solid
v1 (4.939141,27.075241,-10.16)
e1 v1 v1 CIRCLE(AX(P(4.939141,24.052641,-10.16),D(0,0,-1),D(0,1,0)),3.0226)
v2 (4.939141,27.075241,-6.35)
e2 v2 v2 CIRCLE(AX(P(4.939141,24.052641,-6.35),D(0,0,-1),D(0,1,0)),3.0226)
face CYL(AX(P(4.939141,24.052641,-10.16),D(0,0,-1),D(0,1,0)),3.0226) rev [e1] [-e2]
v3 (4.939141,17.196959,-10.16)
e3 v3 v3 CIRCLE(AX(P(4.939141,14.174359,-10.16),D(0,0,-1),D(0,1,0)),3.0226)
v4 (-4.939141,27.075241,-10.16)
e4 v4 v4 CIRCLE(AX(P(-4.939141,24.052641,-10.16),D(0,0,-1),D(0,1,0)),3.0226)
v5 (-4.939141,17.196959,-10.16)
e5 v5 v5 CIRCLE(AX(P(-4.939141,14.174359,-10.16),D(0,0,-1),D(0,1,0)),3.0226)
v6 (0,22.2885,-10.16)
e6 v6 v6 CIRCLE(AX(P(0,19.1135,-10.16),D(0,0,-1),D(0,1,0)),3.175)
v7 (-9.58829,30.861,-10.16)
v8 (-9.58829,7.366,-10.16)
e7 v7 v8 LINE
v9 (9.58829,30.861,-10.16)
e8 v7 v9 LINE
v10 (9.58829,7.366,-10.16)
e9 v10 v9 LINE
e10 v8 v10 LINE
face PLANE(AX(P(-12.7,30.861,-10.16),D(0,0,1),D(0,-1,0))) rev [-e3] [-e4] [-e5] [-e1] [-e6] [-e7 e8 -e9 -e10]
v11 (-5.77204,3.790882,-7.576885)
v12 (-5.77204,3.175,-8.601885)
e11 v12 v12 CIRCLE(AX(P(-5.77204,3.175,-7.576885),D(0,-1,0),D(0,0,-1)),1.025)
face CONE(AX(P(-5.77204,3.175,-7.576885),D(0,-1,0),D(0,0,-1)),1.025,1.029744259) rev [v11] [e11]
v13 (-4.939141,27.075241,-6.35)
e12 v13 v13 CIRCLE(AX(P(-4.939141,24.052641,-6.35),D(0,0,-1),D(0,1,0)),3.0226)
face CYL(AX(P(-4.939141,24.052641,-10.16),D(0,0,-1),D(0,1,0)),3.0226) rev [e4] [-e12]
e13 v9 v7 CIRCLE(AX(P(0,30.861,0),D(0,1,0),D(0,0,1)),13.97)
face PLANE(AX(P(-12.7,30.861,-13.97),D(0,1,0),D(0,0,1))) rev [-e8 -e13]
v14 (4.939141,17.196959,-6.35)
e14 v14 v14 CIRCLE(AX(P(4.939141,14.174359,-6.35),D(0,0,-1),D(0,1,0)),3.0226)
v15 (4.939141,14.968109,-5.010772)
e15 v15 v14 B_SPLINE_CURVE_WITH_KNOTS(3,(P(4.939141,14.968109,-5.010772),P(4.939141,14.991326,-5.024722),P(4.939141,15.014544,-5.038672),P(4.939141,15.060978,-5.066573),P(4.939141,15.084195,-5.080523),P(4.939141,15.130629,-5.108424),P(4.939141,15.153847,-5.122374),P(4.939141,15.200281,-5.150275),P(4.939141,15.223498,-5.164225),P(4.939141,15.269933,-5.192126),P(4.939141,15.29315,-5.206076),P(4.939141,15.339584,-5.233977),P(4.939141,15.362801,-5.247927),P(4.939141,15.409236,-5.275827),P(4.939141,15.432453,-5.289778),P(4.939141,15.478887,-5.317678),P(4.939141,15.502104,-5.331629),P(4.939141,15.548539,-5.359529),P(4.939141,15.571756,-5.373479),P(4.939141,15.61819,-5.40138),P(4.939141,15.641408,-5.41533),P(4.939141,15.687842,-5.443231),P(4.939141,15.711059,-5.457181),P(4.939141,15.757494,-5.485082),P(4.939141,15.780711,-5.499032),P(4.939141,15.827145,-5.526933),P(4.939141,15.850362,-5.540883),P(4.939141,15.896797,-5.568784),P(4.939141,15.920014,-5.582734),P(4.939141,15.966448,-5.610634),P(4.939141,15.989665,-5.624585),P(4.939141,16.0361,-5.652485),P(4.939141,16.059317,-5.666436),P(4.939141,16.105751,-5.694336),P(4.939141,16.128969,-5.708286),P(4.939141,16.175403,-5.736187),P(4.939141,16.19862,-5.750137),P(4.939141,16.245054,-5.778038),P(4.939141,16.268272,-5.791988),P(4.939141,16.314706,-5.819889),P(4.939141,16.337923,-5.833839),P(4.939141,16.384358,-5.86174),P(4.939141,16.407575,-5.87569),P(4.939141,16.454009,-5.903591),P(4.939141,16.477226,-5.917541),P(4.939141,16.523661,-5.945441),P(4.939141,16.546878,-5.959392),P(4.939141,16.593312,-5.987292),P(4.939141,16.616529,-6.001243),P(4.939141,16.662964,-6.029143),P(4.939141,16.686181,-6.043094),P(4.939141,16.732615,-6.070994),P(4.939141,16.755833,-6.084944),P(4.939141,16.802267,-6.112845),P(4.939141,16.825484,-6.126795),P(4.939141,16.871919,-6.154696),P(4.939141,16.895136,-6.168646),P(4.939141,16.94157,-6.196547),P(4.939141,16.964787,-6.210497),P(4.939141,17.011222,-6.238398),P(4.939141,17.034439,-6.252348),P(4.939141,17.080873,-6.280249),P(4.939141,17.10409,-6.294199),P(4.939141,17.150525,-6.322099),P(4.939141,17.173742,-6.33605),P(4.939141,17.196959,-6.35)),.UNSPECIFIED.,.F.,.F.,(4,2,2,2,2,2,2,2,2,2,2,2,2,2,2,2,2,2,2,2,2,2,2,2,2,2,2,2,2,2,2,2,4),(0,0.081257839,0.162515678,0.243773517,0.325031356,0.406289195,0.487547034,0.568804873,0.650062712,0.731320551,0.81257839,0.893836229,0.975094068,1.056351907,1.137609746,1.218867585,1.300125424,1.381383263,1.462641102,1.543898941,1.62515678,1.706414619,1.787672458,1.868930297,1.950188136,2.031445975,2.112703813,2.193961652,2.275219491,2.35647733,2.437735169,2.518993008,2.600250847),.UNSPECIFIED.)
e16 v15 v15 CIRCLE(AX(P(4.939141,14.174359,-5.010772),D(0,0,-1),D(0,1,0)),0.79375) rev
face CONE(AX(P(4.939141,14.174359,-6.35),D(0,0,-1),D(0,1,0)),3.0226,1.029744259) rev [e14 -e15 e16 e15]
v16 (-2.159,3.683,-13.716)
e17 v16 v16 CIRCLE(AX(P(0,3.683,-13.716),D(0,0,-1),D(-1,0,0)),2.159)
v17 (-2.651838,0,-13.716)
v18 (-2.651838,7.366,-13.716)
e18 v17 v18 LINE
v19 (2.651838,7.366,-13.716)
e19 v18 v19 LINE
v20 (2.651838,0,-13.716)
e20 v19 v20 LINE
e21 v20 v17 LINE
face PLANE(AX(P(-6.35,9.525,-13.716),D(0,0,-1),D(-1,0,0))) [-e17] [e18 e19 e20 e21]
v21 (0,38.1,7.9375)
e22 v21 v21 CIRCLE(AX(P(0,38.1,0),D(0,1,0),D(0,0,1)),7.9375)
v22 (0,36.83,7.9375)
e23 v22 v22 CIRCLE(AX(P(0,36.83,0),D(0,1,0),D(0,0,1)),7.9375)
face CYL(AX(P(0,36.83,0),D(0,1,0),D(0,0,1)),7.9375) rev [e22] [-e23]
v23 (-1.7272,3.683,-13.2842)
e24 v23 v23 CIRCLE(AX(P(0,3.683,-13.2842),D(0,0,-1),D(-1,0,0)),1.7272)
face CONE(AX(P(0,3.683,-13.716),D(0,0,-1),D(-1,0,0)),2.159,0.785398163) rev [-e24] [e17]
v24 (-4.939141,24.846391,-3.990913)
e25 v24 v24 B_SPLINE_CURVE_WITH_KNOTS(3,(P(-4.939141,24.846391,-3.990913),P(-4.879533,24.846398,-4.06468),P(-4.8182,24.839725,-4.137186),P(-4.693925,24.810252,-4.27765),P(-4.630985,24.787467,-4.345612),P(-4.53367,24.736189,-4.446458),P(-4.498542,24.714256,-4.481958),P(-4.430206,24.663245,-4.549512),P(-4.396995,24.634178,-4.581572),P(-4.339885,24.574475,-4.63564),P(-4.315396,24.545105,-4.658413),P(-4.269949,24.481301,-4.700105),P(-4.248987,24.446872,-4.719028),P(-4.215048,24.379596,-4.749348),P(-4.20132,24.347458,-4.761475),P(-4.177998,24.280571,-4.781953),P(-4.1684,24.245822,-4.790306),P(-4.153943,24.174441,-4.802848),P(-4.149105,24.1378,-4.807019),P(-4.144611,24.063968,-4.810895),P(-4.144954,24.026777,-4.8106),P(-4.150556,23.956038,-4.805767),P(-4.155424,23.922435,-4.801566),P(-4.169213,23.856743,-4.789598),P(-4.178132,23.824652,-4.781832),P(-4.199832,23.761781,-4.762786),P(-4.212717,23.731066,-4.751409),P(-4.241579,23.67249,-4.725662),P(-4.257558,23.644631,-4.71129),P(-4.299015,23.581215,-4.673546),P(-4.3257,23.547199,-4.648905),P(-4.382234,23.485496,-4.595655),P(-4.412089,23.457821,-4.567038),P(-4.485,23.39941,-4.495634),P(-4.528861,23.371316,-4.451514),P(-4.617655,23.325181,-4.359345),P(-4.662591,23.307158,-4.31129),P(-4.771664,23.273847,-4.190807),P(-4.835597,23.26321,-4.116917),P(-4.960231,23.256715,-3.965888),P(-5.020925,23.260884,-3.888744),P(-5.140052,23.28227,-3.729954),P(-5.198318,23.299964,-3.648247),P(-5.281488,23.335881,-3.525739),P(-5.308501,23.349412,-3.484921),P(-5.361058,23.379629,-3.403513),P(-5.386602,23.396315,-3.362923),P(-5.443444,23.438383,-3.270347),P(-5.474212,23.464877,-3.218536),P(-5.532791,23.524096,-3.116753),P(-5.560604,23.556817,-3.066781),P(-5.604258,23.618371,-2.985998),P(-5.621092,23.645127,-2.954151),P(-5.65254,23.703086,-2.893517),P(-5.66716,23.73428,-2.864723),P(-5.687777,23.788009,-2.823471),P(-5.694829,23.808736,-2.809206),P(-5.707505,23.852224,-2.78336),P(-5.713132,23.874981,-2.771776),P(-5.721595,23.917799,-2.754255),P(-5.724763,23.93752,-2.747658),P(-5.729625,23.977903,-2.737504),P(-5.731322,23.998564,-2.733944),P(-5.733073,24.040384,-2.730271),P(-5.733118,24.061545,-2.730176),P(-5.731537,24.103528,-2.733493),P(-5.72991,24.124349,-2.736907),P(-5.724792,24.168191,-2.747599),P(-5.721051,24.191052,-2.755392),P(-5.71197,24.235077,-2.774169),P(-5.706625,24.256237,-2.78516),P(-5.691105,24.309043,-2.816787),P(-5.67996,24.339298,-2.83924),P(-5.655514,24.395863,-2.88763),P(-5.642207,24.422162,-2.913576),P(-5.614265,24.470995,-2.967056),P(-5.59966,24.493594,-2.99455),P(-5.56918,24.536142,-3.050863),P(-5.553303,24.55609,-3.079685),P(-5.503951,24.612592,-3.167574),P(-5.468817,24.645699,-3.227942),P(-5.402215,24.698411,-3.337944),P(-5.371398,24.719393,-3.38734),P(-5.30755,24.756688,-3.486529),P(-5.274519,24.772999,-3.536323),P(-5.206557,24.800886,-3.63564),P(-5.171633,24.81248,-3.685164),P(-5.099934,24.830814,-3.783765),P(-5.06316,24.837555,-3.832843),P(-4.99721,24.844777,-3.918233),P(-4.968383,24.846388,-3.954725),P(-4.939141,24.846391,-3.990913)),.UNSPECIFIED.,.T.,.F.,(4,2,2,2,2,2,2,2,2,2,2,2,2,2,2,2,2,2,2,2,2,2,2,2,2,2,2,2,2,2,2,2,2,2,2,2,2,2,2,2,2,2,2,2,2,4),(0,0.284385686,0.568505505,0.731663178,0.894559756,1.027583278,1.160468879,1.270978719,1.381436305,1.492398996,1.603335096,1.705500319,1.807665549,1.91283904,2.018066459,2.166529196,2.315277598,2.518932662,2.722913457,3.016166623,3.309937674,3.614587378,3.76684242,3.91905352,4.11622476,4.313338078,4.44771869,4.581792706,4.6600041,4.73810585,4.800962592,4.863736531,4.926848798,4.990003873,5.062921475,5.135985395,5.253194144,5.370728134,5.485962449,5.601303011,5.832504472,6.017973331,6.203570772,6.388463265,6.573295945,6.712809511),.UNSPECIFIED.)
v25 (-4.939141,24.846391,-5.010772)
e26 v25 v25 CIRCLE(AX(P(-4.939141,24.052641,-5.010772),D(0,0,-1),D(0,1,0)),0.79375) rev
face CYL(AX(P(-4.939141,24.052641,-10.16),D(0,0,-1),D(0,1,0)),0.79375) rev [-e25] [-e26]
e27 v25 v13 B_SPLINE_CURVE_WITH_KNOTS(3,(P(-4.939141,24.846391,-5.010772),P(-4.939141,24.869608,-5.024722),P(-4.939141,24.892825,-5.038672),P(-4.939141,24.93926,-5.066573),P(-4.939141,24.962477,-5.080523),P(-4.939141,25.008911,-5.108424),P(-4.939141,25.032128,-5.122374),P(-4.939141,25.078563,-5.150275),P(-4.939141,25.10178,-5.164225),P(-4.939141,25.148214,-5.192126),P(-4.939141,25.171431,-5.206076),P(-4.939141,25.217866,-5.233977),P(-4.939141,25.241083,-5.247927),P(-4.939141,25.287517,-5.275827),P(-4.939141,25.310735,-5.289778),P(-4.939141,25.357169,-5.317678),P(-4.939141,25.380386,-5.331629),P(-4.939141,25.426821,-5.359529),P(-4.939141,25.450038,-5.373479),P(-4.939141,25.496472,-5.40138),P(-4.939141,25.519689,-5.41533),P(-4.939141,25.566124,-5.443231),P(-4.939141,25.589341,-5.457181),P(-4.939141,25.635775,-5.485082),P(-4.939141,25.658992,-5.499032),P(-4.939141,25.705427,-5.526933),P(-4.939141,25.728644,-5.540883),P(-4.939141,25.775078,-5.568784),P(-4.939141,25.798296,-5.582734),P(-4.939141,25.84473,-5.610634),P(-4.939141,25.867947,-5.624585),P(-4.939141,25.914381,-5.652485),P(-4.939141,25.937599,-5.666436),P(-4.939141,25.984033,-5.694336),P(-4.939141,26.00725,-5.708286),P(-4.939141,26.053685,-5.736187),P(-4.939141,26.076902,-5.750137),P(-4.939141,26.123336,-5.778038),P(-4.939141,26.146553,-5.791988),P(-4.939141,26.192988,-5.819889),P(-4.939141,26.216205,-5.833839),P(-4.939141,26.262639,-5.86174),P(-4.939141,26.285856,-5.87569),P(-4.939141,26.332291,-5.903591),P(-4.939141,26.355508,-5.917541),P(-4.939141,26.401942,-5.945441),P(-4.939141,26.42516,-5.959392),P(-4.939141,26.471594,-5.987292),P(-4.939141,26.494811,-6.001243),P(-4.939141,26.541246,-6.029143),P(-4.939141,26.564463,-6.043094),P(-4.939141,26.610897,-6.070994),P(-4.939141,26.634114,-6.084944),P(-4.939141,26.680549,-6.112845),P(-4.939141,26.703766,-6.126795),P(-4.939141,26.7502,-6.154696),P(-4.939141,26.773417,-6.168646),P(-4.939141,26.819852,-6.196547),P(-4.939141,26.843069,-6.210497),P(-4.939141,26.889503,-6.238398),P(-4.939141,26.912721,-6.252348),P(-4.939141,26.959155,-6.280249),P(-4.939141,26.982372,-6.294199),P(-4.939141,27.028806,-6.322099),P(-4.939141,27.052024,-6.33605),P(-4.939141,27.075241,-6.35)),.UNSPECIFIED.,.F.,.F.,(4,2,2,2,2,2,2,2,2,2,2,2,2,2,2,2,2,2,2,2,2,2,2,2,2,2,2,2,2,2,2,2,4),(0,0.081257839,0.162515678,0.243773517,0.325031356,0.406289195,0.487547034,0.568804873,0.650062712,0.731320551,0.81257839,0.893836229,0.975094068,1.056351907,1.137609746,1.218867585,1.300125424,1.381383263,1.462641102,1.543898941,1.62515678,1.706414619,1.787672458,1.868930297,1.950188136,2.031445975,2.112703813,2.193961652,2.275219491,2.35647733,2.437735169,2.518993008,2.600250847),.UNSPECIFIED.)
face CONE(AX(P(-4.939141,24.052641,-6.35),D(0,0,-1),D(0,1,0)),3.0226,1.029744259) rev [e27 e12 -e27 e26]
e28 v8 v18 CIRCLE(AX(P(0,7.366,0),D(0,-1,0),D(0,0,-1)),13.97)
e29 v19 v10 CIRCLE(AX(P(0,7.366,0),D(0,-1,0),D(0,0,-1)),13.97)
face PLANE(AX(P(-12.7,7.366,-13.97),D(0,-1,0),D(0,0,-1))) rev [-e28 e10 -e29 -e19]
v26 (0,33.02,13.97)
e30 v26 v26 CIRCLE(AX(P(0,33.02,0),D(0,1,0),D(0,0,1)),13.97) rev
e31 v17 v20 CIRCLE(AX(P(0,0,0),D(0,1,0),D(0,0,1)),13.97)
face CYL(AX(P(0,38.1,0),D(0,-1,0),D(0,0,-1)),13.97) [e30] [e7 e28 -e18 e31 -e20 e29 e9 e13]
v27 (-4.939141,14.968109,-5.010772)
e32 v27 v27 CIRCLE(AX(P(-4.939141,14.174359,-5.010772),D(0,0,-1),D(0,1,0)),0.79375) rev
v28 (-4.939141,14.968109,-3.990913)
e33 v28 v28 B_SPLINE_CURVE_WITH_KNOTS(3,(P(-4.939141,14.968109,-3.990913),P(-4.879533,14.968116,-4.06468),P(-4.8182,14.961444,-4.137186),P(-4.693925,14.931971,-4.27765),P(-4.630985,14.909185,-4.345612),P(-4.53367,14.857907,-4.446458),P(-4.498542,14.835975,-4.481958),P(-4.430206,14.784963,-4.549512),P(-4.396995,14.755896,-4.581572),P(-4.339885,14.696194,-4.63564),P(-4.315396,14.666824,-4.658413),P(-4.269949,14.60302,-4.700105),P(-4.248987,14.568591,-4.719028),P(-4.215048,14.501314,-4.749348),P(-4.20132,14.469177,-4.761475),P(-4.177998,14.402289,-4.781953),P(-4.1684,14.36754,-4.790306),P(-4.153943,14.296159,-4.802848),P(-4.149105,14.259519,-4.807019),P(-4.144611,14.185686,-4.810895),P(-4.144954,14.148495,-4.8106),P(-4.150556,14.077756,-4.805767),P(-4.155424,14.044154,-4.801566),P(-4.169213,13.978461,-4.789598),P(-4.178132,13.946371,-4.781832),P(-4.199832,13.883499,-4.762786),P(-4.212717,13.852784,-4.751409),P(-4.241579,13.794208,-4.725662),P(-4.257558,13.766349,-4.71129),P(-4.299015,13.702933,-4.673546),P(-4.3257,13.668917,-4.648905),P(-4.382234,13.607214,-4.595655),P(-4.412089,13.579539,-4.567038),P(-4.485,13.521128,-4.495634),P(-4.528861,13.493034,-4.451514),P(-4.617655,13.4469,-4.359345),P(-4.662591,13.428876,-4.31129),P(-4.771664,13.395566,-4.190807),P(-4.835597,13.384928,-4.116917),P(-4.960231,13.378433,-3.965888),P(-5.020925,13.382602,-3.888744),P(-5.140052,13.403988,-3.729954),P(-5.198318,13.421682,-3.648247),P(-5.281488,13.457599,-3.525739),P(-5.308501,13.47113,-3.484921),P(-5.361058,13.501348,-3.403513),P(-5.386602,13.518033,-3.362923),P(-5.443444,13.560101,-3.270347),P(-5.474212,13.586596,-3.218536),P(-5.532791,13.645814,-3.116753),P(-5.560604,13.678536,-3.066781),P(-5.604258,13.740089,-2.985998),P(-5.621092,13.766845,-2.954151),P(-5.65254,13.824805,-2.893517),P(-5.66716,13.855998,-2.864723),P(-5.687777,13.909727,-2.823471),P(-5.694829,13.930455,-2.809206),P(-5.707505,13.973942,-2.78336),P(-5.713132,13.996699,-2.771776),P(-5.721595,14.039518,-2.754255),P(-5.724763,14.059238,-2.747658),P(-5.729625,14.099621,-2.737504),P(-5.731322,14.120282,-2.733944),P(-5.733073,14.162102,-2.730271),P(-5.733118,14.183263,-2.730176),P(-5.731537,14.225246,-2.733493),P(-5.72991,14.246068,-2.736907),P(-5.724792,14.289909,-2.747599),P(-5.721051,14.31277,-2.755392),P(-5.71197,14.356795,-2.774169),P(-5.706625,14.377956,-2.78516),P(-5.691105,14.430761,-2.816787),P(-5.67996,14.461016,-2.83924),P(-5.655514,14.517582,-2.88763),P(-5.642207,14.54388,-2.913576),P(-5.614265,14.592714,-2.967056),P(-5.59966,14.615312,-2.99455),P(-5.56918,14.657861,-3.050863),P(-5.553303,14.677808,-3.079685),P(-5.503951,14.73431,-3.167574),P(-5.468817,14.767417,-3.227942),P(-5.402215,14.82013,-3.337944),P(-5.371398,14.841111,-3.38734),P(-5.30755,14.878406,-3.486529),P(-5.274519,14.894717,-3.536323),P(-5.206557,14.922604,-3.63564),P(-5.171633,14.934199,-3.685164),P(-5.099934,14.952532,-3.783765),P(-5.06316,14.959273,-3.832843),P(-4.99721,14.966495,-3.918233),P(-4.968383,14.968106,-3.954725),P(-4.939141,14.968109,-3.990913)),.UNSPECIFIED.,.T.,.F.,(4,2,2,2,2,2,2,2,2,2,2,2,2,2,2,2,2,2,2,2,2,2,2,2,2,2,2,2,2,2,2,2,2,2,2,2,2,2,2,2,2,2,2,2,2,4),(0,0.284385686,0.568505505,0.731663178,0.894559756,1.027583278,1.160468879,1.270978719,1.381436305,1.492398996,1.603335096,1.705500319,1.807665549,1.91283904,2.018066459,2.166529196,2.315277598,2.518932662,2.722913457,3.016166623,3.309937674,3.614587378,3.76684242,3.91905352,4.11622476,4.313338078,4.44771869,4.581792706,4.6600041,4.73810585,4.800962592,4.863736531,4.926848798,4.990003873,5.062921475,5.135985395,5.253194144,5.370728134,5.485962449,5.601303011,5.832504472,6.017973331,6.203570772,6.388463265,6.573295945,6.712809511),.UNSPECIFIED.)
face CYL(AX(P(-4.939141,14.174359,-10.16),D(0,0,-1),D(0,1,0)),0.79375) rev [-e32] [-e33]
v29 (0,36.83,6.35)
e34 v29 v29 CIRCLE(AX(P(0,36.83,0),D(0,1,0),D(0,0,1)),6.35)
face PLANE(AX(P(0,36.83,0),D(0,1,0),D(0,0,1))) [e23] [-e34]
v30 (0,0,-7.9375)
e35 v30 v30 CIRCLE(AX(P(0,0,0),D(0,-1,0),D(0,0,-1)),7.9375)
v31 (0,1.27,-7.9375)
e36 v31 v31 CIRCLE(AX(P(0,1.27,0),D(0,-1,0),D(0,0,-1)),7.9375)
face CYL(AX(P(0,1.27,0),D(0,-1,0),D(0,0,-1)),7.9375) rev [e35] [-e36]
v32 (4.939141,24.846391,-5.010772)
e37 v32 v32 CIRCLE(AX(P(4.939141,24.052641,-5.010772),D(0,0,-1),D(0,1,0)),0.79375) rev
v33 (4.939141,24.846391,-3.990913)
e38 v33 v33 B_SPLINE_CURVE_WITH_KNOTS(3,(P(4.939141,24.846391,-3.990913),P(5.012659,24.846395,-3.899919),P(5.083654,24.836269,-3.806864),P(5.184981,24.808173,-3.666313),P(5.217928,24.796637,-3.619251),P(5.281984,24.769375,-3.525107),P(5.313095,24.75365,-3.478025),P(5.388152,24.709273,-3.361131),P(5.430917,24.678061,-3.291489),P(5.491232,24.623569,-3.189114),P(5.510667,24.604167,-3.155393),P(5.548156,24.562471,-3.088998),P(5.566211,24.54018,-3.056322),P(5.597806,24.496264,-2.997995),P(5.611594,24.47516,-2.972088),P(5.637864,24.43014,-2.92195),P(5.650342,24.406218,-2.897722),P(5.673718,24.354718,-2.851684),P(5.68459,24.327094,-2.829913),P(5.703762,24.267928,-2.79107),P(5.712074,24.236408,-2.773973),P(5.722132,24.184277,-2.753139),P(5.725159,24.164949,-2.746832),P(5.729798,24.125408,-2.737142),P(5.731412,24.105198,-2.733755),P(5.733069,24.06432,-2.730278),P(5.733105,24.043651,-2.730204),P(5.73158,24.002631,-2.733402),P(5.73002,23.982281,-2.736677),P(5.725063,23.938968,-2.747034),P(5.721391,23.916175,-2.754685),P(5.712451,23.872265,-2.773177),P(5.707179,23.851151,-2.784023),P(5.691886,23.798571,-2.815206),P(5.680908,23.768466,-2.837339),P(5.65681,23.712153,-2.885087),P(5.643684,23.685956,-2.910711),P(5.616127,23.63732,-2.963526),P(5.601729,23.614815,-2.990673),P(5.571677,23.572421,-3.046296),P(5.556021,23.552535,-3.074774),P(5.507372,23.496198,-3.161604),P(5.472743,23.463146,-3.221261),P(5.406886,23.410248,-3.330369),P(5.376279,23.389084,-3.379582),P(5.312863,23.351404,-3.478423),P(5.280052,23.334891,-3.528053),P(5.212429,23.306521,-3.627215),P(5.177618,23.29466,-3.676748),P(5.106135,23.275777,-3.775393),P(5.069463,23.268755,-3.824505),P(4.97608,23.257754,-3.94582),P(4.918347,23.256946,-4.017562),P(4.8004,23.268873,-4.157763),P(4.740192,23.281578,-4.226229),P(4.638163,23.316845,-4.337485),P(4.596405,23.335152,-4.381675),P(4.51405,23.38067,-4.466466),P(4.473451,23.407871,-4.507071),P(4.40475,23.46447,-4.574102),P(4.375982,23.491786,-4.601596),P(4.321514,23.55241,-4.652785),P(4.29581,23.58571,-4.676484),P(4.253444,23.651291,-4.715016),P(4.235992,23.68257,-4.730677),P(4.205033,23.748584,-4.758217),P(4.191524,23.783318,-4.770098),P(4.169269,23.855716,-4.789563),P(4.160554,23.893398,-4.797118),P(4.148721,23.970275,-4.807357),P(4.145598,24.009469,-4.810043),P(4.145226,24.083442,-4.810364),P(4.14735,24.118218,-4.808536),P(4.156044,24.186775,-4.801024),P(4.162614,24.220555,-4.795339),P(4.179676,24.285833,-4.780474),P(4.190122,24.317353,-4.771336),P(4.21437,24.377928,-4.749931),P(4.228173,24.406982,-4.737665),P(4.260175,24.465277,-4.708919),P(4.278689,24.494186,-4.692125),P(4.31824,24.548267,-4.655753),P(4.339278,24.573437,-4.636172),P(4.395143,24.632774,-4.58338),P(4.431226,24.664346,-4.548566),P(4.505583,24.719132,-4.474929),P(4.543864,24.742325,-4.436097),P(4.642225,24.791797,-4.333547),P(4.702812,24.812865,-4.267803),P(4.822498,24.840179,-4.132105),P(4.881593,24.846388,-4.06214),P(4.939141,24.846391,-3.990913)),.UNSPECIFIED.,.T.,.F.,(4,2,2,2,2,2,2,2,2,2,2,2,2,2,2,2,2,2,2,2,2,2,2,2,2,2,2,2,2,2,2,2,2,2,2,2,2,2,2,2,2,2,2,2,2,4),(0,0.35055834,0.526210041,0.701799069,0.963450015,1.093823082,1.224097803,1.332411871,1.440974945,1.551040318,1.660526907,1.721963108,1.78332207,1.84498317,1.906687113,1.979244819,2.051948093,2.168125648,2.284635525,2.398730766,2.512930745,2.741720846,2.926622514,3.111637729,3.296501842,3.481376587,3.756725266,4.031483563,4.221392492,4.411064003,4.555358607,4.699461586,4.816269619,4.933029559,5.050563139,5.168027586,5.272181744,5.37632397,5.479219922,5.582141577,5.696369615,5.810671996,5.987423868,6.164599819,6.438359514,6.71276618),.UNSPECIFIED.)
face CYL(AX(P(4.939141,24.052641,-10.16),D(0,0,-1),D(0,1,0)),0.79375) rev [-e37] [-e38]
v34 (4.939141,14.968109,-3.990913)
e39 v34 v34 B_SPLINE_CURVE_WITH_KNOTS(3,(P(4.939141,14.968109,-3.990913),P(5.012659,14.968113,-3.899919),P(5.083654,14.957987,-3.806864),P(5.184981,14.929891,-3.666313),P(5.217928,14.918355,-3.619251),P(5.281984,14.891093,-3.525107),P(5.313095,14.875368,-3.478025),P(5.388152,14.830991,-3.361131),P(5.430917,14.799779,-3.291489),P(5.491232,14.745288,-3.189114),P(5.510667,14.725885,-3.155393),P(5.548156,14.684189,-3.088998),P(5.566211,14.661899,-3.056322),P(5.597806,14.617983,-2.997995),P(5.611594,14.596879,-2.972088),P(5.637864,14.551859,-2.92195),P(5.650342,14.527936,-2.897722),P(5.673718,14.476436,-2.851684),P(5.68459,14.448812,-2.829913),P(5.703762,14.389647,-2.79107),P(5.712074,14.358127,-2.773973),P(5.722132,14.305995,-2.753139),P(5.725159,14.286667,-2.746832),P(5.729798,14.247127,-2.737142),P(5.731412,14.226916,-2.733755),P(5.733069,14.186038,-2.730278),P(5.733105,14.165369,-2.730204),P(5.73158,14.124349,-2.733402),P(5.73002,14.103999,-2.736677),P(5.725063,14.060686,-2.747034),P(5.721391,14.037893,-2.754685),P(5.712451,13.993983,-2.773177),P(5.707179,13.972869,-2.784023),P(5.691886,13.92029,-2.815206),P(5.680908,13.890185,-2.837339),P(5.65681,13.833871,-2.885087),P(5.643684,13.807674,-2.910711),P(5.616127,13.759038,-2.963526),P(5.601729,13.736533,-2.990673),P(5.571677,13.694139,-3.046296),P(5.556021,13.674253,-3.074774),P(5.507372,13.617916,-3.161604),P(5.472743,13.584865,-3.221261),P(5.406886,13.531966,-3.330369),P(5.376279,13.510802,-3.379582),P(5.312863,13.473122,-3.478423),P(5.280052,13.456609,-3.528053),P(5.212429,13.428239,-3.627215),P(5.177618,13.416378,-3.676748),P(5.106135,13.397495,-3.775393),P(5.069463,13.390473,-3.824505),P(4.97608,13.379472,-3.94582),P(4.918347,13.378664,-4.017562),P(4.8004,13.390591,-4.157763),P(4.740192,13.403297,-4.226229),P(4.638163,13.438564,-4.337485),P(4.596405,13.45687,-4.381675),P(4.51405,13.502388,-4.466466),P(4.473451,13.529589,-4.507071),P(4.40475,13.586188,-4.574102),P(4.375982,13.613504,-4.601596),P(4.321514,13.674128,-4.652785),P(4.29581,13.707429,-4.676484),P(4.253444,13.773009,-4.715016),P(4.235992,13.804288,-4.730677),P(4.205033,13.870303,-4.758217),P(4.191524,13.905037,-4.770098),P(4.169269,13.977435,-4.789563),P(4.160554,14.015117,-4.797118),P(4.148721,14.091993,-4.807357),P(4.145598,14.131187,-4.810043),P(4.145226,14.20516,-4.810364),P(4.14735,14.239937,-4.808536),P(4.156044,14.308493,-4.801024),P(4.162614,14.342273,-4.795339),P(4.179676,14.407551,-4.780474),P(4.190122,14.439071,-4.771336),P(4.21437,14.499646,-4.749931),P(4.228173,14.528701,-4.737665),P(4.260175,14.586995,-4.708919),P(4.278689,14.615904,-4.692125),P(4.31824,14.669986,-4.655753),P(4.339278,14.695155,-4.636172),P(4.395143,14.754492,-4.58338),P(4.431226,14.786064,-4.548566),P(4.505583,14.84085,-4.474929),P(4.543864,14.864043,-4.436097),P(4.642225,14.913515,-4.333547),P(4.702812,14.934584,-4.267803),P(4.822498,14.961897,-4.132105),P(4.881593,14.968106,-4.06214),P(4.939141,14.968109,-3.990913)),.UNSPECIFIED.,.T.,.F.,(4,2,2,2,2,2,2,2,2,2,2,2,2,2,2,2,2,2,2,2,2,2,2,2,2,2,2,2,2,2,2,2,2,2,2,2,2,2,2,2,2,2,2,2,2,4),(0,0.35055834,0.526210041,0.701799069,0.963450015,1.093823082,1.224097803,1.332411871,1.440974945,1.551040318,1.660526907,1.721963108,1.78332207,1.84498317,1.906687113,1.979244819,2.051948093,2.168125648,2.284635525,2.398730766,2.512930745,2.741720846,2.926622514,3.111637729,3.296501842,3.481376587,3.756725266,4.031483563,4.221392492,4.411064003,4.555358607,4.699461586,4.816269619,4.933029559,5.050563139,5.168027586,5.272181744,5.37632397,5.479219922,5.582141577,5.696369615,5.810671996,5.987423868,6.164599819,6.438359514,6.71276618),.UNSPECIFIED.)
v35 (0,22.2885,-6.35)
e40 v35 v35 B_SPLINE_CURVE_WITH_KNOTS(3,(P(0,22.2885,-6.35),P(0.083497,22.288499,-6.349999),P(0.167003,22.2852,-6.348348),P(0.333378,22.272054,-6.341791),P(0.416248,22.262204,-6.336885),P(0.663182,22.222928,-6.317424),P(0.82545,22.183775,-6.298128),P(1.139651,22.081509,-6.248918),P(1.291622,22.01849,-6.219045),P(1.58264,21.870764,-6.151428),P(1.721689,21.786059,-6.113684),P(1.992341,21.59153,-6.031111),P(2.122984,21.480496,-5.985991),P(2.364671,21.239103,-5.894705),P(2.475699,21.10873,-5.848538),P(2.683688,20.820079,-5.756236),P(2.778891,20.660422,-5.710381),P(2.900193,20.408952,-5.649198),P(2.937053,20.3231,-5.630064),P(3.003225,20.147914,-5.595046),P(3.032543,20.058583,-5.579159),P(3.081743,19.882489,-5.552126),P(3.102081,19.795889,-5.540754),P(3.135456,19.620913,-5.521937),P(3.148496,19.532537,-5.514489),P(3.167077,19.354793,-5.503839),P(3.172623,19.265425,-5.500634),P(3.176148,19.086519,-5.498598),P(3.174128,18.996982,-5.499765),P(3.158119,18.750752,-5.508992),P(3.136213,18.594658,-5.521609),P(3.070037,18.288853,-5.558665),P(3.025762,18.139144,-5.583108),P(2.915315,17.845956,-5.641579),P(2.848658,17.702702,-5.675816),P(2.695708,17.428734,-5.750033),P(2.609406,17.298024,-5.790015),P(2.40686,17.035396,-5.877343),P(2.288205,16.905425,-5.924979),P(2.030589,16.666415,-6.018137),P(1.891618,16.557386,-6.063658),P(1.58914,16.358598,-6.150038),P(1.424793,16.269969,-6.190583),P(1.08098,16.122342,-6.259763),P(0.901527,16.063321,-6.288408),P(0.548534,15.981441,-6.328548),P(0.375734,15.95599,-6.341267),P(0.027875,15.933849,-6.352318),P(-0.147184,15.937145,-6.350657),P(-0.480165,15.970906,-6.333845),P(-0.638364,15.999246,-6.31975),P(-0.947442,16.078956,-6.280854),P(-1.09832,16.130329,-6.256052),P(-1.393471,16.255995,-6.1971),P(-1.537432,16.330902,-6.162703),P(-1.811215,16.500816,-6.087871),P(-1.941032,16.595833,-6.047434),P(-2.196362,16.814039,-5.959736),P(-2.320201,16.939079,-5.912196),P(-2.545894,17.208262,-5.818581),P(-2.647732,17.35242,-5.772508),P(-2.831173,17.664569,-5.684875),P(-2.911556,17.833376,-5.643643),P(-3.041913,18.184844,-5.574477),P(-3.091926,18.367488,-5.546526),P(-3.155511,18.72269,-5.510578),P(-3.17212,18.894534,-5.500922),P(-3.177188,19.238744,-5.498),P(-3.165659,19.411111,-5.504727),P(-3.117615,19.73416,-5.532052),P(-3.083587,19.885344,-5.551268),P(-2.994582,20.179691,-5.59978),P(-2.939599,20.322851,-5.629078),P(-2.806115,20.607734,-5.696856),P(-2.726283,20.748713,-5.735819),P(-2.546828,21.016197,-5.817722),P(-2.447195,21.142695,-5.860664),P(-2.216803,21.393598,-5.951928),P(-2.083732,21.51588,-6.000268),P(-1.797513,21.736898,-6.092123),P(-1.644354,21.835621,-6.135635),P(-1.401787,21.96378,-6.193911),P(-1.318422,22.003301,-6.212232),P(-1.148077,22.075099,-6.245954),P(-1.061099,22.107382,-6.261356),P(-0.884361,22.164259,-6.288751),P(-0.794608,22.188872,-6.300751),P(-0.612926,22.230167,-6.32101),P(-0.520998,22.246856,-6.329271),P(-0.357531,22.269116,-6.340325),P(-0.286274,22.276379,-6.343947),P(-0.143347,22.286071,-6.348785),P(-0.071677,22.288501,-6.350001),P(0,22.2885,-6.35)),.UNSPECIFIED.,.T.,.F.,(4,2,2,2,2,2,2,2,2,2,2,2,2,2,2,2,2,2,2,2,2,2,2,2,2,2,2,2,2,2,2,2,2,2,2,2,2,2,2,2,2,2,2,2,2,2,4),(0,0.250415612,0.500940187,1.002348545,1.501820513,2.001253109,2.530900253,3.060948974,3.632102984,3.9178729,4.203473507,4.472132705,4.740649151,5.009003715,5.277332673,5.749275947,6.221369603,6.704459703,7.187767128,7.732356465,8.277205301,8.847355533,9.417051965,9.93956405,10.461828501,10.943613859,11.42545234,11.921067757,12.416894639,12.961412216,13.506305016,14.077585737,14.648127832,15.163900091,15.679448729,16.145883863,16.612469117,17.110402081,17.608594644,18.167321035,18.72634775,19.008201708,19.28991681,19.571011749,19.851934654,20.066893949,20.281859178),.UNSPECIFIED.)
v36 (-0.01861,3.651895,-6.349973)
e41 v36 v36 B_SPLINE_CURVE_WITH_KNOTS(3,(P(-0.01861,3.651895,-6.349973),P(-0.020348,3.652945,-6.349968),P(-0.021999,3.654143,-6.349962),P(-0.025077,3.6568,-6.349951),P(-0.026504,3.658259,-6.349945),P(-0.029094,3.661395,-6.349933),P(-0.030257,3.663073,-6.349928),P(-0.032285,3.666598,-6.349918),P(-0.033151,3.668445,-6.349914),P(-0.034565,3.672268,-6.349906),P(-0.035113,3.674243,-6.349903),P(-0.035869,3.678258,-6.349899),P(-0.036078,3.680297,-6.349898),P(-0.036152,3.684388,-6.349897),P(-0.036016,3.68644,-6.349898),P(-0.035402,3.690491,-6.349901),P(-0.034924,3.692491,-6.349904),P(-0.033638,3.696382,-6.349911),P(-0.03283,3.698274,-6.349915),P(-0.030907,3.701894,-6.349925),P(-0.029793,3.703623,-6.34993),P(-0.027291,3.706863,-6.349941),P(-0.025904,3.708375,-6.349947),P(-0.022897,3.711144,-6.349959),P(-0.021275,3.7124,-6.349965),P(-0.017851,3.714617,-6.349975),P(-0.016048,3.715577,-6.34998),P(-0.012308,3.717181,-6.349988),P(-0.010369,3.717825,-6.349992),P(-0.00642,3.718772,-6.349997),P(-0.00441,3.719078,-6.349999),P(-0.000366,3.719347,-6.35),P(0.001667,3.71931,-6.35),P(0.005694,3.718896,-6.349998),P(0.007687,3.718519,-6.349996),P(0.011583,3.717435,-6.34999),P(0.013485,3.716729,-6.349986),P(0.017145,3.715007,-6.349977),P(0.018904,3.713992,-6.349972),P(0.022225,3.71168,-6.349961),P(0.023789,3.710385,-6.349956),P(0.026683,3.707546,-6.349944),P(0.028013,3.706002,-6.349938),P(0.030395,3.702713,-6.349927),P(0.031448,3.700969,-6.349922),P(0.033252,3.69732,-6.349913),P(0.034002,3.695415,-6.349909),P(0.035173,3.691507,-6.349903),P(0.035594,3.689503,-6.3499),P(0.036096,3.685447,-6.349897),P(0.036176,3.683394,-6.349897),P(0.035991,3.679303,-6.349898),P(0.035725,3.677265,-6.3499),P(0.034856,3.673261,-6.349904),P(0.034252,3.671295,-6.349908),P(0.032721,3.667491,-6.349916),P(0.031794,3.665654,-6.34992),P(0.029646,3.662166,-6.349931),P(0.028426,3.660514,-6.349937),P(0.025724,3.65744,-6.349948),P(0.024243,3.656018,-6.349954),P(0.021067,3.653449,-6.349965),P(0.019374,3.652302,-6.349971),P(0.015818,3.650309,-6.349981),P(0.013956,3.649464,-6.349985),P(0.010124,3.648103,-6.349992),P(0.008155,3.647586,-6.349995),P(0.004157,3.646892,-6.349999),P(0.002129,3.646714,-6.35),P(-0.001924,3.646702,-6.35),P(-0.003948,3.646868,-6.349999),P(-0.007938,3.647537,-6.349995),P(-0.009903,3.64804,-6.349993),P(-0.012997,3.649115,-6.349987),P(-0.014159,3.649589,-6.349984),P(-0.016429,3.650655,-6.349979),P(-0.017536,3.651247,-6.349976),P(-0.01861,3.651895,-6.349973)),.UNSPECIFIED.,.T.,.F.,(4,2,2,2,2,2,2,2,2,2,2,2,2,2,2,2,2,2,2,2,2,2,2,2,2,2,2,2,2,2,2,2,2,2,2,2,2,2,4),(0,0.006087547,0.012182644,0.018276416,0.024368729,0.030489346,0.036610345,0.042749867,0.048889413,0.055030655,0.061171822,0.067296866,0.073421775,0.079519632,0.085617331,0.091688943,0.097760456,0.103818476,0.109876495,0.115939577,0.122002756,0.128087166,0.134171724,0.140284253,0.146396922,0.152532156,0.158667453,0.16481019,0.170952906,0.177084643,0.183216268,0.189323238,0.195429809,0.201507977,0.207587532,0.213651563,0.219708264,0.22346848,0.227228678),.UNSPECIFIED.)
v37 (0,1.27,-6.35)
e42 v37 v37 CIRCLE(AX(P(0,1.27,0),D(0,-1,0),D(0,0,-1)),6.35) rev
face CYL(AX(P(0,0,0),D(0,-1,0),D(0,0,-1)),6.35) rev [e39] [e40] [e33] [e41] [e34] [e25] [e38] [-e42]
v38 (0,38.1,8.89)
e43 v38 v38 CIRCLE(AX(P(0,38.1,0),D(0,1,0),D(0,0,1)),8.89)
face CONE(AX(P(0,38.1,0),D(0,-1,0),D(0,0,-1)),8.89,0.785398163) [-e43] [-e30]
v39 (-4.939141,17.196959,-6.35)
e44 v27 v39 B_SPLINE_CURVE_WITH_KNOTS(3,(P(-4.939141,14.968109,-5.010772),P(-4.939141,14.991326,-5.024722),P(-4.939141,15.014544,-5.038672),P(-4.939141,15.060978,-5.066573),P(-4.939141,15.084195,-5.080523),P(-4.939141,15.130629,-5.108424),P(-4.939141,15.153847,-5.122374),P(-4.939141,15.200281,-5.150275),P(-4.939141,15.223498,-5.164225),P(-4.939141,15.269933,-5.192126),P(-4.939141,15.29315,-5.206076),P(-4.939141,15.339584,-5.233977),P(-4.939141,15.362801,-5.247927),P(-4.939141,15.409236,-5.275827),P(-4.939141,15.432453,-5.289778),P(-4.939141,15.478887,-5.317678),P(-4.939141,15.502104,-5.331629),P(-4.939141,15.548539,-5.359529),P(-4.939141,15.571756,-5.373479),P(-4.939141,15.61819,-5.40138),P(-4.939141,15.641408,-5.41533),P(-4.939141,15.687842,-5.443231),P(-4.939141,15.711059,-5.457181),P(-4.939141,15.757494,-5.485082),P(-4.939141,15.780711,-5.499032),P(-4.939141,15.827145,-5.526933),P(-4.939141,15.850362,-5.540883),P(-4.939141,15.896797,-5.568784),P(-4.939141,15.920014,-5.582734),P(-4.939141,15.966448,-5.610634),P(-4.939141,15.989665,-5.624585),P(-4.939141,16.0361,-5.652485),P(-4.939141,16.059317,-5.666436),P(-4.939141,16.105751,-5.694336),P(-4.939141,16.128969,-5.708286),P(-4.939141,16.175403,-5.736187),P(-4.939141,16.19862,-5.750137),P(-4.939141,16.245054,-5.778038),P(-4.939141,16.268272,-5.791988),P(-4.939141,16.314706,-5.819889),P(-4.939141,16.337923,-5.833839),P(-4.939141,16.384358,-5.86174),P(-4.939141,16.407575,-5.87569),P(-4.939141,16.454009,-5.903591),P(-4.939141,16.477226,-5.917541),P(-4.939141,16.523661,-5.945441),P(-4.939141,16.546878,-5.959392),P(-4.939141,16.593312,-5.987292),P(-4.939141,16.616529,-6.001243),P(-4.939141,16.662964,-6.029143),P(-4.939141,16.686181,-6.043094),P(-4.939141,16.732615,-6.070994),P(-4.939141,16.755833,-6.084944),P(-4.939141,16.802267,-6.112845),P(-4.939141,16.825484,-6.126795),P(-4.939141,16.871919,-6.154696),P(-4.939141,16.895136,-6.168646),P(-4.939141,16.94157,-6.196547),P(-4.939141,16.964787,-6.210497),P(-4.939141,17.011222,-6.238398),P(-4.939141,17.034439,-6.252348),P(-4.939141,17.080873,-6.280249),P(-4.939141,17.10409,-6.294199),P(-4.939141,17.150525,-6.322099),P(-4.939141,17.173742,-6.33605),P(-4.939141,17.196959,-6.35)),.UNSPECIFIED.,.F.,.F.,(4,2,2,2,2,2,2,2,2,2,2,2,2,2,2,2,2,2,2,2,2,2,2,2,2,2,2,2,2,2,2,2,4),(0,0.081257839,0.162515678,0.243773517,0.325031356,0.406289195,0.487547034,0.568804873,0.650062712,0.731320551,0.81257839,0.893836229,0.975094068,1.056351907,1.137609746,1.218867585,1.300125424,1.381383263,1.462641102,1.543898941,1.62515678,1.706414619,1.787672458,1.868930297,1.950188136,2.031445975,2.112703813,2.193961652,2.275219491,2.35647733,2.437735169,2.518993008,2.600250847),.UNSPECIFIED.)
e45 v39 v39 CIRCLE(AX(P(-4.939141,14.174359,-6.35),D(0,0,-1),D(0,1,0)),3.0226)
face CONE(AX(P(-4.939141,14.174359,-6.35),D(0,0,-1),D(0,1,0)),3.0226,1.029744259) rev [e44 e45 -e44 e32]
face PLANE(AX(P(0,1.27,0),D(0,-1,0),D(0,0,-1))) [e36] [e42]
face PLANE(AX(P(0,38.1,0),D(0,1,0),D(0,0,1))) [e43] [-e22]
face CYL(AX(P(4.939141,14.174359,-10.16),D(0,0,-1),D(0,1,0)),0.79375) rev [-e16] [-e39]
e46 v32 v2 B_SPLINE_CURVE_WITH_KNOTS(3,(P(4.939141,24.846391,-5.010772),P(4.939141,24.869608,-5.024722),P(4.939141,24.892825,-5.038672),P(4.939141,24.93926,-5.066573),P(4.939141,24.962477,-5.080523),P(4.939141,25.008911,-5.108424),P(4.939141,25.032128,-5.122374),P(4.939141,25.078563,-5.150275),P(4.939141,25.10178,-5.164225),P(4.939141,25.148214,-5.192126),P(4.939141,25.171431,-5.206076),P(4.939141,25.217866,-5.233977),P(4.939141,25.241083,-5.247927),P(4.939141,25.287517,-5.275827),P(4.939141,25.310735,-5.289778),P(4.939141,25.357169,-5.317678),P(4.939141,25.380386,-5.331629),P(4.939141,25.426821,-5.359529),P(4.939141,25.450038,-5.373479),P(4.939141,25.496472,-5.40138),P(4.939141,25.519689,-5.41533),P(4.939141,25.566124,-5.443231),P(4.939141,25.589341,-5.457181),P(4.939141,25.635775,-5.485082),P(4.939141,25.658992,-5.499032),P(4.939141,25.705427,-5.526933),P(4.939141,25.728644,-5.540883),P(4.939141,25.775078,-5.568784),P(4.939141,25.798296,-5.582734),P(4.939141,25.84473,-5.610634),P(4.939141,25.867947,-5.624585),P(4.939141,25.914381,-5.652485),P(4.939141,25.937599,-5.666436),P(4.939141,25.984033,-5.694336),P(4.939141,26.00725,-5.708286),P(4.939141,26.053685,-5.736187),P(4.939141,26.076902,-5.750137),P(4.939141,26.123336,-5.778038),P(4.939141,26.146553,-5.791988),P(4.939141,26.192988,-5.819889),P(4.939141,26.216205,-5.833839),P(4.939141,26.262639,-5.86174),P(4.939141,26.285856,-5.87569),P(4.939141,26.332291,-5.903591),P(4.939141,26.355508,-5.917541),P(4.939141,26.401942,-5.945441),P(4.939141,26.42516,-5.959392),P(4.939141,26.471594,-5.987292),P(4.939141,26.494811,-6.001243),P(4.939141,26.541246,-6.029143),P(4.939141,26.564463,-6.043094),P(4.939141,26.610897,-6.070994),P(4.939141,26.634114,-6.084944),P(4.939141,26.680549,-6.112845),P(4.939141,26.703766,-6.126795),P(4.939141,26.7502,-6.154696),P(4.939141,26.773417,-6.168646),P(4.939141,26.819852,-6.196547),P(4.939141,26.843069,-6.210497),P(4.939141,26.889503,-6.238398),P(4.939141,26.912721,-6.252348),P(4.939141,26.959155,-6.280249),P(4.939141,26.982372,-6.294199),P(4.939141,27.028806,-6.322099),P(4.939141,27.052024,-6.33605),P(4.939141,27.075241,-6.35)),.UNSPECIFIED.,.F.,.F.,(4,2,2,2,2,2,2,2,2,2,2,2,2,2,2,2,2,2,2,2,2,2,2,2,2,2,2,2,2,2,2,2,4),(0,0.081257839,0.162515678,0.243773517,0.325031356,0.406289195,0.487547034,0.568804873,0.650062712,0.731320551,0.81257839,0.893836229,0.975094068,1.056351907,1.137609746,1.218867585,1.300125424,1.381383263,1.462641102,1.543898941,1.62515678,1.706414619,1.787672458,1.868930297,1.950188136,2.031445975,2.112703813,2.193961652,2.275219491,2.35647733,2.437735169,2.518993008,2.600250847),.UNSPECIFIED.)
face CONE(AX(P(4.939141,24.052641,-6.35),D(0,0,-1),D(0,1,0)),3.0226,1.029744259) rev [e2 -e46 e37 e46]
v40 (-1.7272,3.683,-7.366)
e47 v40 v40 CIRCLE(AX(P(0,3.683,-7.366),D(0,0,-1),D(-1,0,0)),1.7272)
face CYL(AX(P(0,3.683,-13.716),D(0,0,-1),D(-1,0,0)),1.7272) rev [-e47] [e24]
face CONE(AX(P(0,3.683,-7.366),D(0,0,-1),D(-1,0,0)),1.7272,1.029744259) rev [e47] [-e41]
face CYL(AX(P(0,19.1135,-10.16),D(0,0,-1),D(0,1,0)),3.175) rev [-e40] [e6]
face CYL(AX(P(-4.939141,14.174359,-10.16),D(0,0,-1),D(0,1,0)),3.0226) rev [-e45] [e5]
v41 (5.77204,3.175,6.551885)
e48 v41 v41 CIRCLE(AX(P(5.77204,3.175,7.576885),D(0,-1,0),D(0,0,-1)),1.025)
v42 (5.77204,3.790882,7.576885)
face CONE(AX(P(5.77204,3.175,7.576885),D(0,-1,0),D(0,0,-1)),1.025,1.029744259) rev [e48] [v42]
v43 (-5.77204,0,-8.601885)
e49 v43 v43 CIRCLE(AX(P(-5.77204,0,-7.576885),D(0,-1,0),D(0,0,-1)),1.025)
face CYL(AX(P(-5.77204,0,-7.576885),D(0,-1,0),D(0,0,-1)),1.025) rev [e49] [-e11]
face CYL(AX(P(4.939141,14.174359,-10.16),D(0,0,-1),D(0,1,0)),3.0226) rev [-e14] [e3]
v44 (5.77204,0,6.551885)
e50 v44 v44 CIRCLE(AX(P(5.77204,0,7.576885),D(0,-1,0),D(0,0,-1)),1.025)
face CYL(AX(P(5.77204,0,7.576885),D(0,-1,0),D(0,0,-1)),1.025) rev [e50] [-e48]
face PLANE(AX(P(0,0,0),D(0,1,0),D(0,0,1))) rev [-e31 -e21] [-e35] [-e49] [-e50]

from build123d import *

# Parameters (mm, degrees)
SKETCH2_R                           = 13.97
BOSS_EXTRUDE1_DEPTH                 = 38.1
CHAMFER1_SIZE                       = 5.08
SKETCH5_R                           = 7.9375
CUT_EXTRUDE2_DEPTH                  = 1.27
SKETCH8_W                           = 3.81
SKETCH8_H                           = 23.495
CUT_EXTRUDE4_DEPTH                  = 12.7
SKETCH9_W                           = 12.7
SKETCH9_H                           = 0.508
CUT_EXTRUDE5_DEPTH                  = 9.525
F_1_2_0_5_DIAMETER_HOLE1_D          = 12.7
F_1_4_0_25_DIAMETER_HOLE1_REACH     = 49.213
F_1_4_0_25_DIAMETER_HOLE1_BORE_R    = 3.175
B_0_238_DIAMETER_HOLE1_D            = 6.0452
B_0_238_DIAMETER_HOLE1_DEPTH        = 3.81
B_0_238_DIAMETER_HOLE1_TIP          = 1.816161307
F_1_16_0_0625_DIAMETER_HOLE1_REACH  = 49.213
F_1_16_0_0625_DIAMETER_HOLE1_BORE_R = 0.79375
CUT_EXTRUDE6_START                  = -1.27
SKETCH21_R                          = 7.9375
CUT_EXTRUDE6_DEPTH                  = 1.27
F_8_32_TAPPED_HOLE1_D               = 3.4544
F_8_32_TAPPED_HOLE1_DEPTH           = 6.35
F_8_32_TAPPED_HOLE1_CSINK_D         = 4.318
F_8_32_TAPPED_HOLE1_CSINK_ANGLE     = 90
F_8_32_TAPPED_HOLE1_TIP             = 1.037806461


# Read off the part's stored shape, not the designer's step: M2.5x0.45 Tapped Hole1
with BuildPart() as part:
    # Sketch2 → Boss-Extrude1 (new body)
    with BuildSketch(Plane(origin=(0, 0, 0), x_dir=(1, 0, 0), z_dir=(0, 1, 0))):
        with Locations(Location((0, 0, 0), (0, 0, 90))):
            Circle(SKETCH2_R)
    extrude(amount=BOSS_EXTRUDE1_DEPTH)

    # Chamfer1
    chamfer1_edges = [part.edges().sort_by_distance(p)[0] for p in [
        (0, 38.1, 13.97),
    ]]
    chamfer(chamfer1_edges, length=CHAMFER1_SIZE)

    # Sketch5 → Cut-Extrude2 (cut)
    with BuildSketch(Plane(origin=(0, 38.1, 0), x_dir=(1, 0, 0), z_dir=(0, 1, 0))):
        with Locations(Location((0, 0, 0), (0, 0, 270))):
            Circle(SKETCH5_R)
    extrude(amount=-CUT_EXTRUDE2_DEPTH, mode=Mode.SUBTRACT)

    # Sketch8 → Cut-Extrude4 (cut, symmetric)
    with BuildSketch(Plane(origin=(0, 0, 0), x_dir=(0, 0, -1), z_dir=(1, 0, 0))):
        with Locations((12.065, 19.1135)):
            Rectangle(SKETCH8_W, SKETCH8_H)
    extrude(amount=CUT_EXTRUDE4_DEPTH, both=True, mode=Mode.SUBTRACT)

    # Sketch9 → Cut-Extrude5 (cut, symmetric)
    with BuildSketch(Plane(origin=(0, 0, 0), x_dir=(1, 0, 0), z_dir=(0, 1, 0))):
        with Locations((0, 13.97)):
            Rectangle(SKETCH9_W, SKETCH9_H)
    extrude(amount=CUT_EXTRUDE5_DEPTH, both=True, mode=Mode.SUBTRACT)

    # 1/2 (0.5) Diameter Hole1 (through all)
    with Locations(Plane(origin=(0, 0, 0), x_dir=(-1, 0, 0), z_dir=(0, -1, 0))):
        with Locations((0, 0)):
            Hole(F_1_2_0_5_DIAMETER_HOLE1_D / 2)

    # 1/4 (0.25) Diameter Hole1 bore → 1/4 (0.25) Diameter Hole1 (cut, up to next)
    with BuildSketch(Plane(origin=(0, 0, -10.16), x_dir=(-1, 0, 0), z_dir=(0, 0, -1)), mode=Mode.PRIVATE) as f_1_4_0_25_diameter_hole1_sk1:
        with Locations((0, 19.1135)):
            Circle(F_1_4_0_25_DIAMETER_HOLE1_BORE_R)
    f_1_4_0_25_diameter_hole1_tool1 = extrude(f_1_4_0_25_diameter_hole1_sk1.sketch, amount=-F_1_4_0_25_DIAMETER_HOLE1_REACH, mode=Mode.PRIVATE) & part.part
    add(f_1_4_0_25_diameter_hole1_tool1.solids().sort_by_distance((0, 19.1135, -10.16))[0], mode=Mode.SUBTRACT)

    # B (0.238) Diameter Hole1
    with Locations(Plane(origin=(0, 0, -10.16), x_dir=(-1, 0, 0), z_dir=(0, 0, -1))):
        with Locations((4.939140867, 24.052640867), (4.939140867, 14.174359133), (-4.939140867, 14.174359133), (-4.939140867, 24.052640867)):
            Hole(B_0_238_DIAMETER_HOLE1_D / 2, depth=B_0_238_DIAMETER_HOLE1_DEPTH)
            with Locations((0, 0, -(B_0_238_DIAMETER_HOLE1_DEPTH + B_0_238_DIAMETER_HOLE1_TIP / 2))):  # 118° drill point
                Cone(0, B_0_238_DIAMETER_HOLE1_D / 2, B_0_238_DIAMETER_HOLE1_TIP, mode=Mode.SUBTRACT)

    # 1/16 (0.0625) Diameter Hole1 bore → 1/16 (0.0625) Diameter Hole1 (cut, up to next)
    with BuildSketch(Plane(origin=(0, 0, -10.16), x_dir=(-1, 0, 0), z_dir=(0, 0, -1)), mode=Mode.PRIVATE) as f_1_16_0_0625_diameter_hole1_sk1:
        with Locations((4.939140867, 24.052640867)):
            Circle(F_1_16_0_0625_DIAMETER_HOLE1_BORE_R)
    f_1_16_0_0625_diameter_hole1_tool1 = extrude(f_1_16_0_0625_diameter_hole1_sk1.sketch, amount=-F_1_16_0_0625_DIAMETER_HOLE1_REACH, mode=Mode.PRIVATE) & part.part
    # 1/16 (0.0625) Diameter Hole1 bore → 1/16 (0.0625) Diameter Hole1 (cut, up to next)
    with BuildSketch(Plane(origin=(0, 0, -10.16), x_dir=(-1, 0, 0), z_dir=(0, 0, -1)), mode=Mode.PRIVATE) as f_1_16_0_0625_diameter_hole1_sk2:
        with Locations((4.939140867, 14.174359133)):
            Circle(F_1_16_0_0625_DIAMETER_HOLE1_BORE_R)
    f_1_16_0_0625_diameter_hole1_tool2 = extrude(f_1_16_0_0625_diameter_hole1_sk2.sketch, amount=-F_1_16_0_0625_DIAMETER_HOLE1_REACH, mode=Mode.PRIVATE) & part.part
    # 1/16 (0.0625) Diameter Hole1 bore → 1/16 (0.0625) Diameter Hole1 (cut, up to next)
    with BuildSketch(Plane(origin=(0, 0, -10.16), x_dir=(-1, 0, 0), z_dir=(0, 0, -1)), mode=Mode.PRIVATE) as f_1_16_0_0625_diameter_hole1_sk3:
        with Locations((-4.939140867, 14.174359133)):
            Circle(F_1_16_0_0625_DIAMETER_HOLE1_BORE_R)
    f_1_16_0_0625_diameter_hole1_tool3 = extrude(f_1_16_0_0625_diameter_hole1_sk3.sketch, amount=-F_1_16_0_0625_DIAMETER_HOLE1_REACH, mode=Mode.PRIVATE) & part.part
    # 1/16 (0.0625) Diameter Hole1 bore → 1/16 (0.0625) Diameter Hole1 (cut, up to next)
    with BuildSketch(Plane(origin=(0, 0, -10.16), x_dir=(-1, 0, 0), z_dir=(0, 0, -1)), mode=Mode.PRIVATE) as f_1_16_0_0625_diameter_hole1_sk4:
        with Locations((-4.939140867, 24.052640867)):
            Circle(F_1_16_0_0625_DIAMETER_HOLE1_BORE_R)
    f_1_16_0_0625_diameter_hole1_tool4 = extrude(f_1_16_0_0625_diameter_hole1_sk4.sketch, amount=-F_1_16_0_0625_DIAMETER_HOLE1_REACH, mode=Mode.PRIVATE) & part.part
    add(f_1_16_0_0625_diameter_hole1_tool1.solids().sort_by_distance((-4.939141, 24.052641, -10.16))[0], mode=Mode.SUBTRACT)
    add(f_1_16_0_0625_diameter_hole1_tool2.solids().sort_by_distance((-4.939141, 14.174359, -10.16))[0], mode=Mode.SUBTRACT)
    add(f_1_16_0_0625_diameter_hole1_tool3.solids().sort_by_distance((4.939141, 14.174359, -10.16))[0], mode=Mode.SUBTRACT)
    add(f_1_16_0_0625_diameter_hole1_tool4.solids().sort_by_distance((4.939141, 24.052641, -10.16))[0], mode=Mode.SUBTRACT)

    # Sketch21 → Cut-Extrude6 (cut)
    with BuildSketch(Plane.XZ.offset(CUT_EXTRUDE6_START)):
        with Locations(Location((0, 0, 0), (0, 0, 90))):
            Circle(SKETCH21_R)
    extrude(amount=CUT_EXTRUDE6_DEPTH, mode=Mode.SUBTRACT)

    # #8-32 Tapped Hole1
    with Locations(Plane(origin=(0, 0, -13.716), x_dir=(-1, 0, 0), z_dir=(0, 0, -1))):
        with Locations((0, 3.683)):
            CounterSinkHole(F_8_32_TAPPED_HOLE1_D / 2, F_8_32_TAPPED_HOLE1_CSINK_D / 2, depth=F_8_32_TAPPED_HOLE1_DEPTH, counter_sink_angle=F_8_32_TAPPED_HOLE1_CSINK_ANGLE)
            with Locations((0, 0, -(F_8_32_TAPPED_HOLE1_DEPTH + F_8_32_TAPPED_HOLE1_TIP / 2))):  # 118° drill point
                Cone(0, F_8_32_TAPPED_HOLE1_D / 2, F_8_32_TAPPED_HOLE1_TIP, mode=Mode.SUBTRACT)

    # M2.5x0.45 Tapped Hole1 outline → M2.5x0.45 Tapped Hole1 (revolve, cut)
    with BuildSketch(Plane(origin=(-5.772039513, 0, -7.576884905), x_dir=(1, 0, 0), z_dir=(0, 0, 1))):
        Polygon((1.025, 3.175), (0, 3.790882135), (0, 0), (1.025, 0), align=None)
    revolve(axis=Axis((-5.772039513, 0, -7.576884905), (0, 1, 0)), mode=Mode.SUBTRACT)

    # M2.5x0.45 Tapped Hole1 2 outline → M2.5x0.45 Tapped Hole1 2 (revolve, cut)
    with BuildSketch(Plane(origin=(5.772039513, 0, 7.576884905), x_dir=(1, 0, 0), z_dir=(0, 0, 1))):
        Polygon((1.025, 3.175), (0, 3.790882135), (0, 0), (1.025, 0), align=None)
    revolve(axis=Axis((5.772039513, 0, 7.576884905), (0, 1, 0)), mode=Mode.SUBTRACT)


solid = part.part
